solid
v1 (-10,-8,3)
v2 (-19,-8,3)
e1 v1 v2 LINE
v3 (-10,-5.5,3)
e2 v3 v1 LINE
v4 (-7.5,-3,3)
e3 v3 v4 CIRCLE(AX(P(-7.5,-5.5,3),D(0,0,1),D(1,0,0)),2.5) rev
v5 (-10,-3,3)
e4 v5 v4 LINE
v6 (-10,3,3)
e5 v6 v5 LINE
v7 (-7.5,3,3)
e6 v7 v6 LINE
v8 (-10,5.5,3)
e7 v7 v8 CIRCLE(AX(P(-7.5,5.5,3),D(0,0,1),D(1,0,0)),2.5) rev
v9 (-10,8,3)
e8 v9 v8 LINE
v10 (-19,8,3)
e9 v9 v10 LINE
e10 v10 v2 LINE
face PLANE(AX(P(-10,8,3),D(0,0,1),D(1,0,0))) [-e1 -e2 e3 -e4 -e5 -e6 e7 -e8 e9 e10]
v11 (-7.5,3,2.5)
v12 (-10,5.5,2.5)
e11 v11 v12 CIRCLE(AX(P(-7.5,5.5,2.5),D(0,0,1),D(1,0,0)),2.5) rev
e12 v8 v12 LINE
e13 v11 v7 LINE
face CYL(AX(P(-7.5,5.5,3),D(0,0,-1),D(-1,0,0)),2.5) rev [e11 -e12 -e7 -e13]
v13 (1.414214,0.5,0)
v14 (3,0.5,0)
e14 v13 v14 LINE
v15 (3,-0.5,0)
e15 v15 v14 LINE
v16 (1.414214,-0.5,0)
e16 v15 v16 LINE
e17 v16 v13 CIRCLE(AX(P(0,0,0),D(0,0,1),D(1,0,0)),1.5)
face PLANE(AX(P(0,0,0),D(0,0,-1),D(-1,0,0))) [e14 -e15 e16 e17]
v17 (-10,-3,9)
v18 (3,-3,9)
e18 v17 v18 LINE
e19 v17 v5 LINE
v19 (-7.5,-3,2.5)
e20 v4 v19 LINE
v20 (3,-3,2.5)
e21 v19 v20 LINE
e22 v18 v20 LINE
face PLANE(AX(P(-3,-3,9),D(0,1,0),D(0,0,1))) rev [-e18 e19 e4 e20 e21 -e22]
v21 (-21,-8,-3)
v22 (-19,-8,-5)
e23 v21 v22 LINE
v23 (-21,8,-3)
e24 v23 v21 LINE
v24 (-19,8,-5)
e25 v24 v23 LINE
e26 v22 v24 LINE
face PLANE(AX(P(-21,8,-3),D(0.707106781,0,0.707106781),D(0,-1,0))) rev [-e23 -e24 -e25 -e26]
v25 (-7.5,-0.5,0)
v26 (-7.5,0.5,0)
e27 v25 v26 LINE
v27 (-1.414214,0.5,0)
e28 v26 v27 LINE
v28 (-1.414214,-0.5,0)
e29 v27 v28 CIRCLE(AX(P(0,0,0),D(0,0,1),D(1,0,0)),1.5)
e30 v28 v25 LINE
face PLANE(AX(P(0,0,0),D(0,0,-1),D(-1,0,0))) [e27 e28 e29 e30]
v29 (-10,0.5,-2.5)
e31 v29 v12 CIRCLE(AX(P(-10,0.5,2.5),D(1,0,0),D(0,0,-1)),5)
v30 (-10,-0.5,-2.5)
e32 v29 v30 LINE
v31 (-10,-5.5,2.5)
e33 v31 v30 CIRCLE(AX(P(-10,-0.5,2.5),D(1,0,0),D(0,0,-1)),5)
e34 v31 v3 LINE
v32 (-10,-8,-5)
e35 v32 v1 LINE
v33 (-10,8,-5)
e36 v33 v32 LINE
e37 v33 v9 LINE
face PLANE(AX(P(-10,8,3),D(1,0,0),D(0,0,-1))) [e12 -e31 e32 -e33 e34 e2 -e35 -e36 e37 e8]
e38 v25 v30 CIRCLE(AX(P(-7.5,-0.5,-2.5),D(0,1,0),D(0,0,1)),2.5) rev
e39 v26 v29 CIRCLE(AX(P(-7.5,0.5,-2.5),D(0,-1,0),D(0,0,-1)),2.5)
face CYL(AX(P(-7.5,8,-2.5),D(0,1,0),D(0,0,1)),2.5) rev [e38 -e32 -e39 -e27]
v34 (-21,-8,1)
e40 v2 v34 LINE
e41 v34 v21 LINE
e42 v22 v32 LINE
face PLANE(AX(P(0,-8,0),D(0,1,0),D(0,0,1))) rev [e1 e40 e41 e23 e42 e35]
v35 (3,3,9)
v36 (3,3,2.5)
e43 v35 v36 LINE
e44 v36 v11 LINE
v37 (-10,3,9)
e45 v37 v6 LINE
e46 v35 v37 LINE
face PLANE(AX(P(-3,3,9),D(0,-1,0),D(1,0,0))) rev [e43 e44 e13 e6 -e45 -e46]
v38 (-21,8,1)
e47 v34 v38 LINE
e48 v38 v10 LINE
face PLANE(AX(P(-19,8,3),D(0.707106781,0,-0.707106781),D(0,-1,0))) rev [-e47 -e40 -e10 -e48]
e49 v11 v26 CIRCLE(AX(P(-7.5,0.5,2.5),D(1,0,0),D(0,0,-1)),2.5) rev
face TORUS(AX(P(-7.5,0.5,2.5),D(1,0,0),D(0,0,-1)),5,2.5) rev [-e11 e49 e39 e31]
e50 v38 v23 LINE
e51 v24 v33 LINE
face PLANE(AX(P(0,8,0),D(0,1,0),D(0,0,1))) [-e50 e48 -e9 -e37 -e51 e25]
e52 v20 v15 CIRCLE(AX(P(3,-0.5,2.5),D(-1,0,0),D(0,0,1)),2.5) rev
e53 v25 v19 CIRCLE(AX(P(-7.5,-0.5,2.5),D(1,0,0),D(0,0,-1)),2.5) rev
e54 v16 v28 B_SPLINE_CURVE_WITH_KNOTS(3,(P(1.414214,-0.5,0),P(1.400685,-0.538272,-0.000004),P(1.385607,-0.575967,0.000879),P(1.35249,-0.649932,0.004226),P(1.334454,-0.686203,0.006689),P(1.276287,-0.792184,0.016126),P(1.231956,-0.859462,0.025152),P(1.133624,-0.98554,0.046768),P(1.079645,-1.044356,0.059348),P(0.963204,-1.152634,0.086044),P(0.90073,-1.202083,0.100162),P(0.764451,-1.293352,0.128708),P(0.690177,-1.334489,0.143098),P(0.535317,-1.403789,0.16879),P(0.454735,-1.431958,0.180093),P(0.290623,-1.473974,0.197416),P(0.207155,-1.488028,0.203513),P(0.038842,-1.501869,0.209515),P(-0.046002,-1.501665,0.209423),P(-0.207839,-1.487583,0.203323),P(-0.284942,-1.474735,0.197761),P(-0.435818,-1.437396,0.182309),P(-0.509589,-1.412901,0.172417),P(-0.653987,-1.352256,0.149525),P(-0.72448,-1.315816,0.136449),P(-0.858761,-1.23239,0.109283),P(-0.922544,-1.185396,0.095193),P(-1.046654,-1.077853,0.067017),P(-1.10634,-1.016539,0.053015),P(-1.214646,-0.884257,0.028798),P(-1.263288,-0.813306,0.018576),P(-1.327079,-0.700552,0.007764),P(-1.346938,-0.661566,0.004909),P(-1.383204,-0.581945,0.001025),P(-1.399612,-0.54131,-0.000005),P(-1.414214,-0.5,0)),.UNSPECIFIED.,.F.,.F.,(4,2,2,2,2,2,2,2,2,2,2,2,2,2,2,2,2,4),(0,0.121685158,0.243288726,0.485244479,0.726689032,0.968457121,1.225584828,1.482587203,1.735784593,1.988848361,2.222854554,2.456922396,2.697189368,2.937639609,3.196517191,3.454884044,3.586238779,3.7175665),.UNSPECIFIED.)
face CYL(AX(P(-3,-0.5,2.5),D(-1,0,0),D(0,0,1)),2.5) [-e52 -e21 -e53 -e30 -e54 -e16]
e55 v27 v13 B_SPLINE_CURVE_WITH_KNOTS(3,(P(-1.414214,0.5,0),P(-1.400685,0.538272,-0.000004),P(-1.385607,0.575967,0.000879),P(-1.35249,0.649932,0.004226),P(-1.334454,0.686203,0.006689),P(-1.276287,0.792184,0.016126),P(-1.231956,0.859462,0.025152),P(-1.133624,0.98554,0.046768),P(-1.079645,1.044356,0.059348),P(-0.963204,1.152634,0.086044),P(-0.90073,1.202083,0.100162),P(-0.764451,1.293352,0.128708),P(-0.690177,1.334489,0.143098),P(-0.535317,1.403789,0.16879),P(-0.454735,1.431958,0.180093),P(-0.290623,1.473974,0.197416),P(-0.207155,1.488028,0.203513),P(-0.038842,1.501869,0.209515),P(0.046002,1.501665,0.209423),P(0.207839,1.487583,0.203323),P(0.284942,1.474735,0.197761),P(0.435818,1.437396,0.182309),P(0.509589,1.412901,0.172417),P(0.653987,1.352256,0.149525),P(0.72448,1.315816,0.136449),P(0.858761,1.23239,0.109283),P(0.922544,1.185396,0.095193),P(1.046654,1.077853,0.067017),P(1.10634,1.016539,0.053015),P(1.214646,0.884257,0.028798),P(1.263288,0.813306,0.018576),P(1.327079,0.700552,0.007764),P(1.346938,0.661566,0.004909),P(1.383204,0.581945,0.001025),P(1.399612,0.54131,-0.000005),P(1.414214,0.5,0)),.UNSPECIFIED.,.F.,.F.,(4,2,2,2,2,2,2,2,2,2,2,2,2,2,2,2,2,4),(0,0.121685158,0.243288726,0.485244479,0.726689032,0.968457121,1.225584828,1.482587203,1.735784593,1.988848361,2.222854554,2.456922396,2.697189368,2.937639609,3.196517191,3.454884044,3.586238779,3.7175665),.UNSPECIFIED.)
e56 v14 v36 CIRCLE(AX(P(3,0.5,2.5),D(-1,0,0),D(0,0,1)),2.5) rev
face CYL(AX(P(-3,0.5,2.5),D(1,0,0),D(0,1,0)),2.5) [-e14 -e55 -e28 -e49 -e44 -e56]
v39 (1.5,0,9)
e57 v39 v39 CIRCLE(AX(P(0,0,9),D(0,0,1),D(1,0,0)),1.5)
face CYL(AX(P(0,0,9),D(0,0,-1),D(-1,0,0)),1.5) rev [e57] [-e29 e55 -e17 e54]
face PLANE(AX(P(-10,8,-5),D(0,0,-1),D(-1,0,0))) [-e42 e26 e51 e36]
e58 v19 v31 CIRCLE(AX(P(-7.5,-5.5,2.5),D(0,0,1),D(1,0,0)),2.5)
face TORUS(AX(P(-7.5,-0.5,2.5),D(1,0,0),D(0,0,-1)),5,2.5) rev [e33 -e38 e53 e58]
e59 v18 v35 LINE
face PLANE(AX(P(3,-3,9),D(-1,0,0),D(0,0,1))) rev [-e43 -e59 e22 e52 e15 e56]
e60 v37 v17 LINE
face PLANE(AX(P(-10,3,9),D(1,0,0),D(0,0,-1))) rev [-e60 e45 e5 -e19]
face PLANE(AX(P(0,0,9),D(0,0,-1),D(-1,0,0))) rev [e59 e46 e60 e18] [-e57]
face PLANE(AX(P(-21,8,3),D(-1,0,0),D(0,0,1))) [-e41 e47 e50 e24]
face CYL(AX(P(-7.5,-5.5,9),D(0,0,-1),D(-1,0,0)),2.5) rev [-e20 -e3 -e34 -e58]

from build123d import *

# Parameters (mm, degrees)
ESBO_O1_R                     = 1.5
RESSALTO_EXTRUS_O1_DEPTH      = 9
RESSALTO_EXTRUS_O2_DEPTH      = 5
RESSALTO_EXTRUS_O2_DEPTH_BACK = 11
ESBO_O2_W                     = 11
ESBO_O2_H                     = 8
FILETE1_R                     = 2.5
CHANFRO1_SIZE                 = 2


with BuildPart() as part:
    # Esboço1 → Ressalto-extrusão1 (new body)
    with BuildSketch(Plane.XY):
        Polygon((-3, -3), (3, -3), (3, 3), (-3, 3), (-10, 3), (-10, -3), align=None)
        Circle(ESBO_O1_R, mode=Mode.SUBTRACT)
    extrude(amount=RESSALTO_EXTRUS_O1_DEPTH)

    # Esboço2 → Ressalto-extrusão2 (add, two sides: drawn at the far end of the back side and taken through both)
    with BuildSketch(Plane.XZ.offset(3).offset(-RESSALTO_EXTRUS_O2_DEPTH_BACK)):
        with Locations((-15.5, -1)):
            Rectangle(ESBO_O2_W, ESBO_O2_H)
    extrude(amount=RESSALTO_EXTRUS_O2_DEPTH + RESSALTO_EXTRUS_O2_DEPTH_BACK)

    # Filete1
    # the kernel refuses this fillet: 2.5 mm, written as the material it takes off along each edge
    with BuildSketch(Plane(origin=(-10, -3, 0), x_dir=(0, 0, 1), z_dir=(1, 0, 0))) as filete1_piece_1:
        with BuildLine():
            CenterArc((FILETE1_R, -FILETE1_R), FILETE1_R, 90, 90)
            Line((0, -FILETE1_R), (0, 0))
            Line((0, 0), (FILETE1_R, 0))
        make_face()
    extrude(amount=19.25, mode=Mode.SUBTRACT)
    with BuildSketch(Plane(origin=(9.25, 3, 0), x_dir=(0, -1, 0), z_dir=(-1, 0, 0))) as filete1_piece_2:
        with BuildLine():
            CenterArc((FILETE1_R, FILETE1_R), FILETE1_R, 180, 90)
            Line((0, FILETE1_R), (0, 0))
            Line((0, 0), (FILETE1_R, 0))
        make_face()
    extrude(amount=19.25, mode=Mode.SUBTRACT)
    # the kernel refuses this fillet: 2.5 mm, written as the material it adds along each edge
    with BuildSketch(Plane(origin=(-10, -3, 2.5), x_dir=(1, 0, 0), z_dir=(0, 0, 1)), Plane(origin=(-10, 3, 2.5), x_dir=(0, 1, 0), z_dir=(0, 0, 1))) as filete1_2_piece_1:
        with BuildLine():
            CenterArc((FILETE1_R, -FILETE1_R), FILETE1_R, 90, 90)
            Line((0, -FILETE1_R), (0, 0))
            Line((0, 0), (FILETE1_R, 0))
        make_face()
    extrude(amount=0.5)
    with BuildSketch(Plane(origin=(-10, 0.5, 0), x_dir=(0, 0, -1), z_dir=(0, -1, 0))) as filete1_2_piece_2:
        with BuildLine():
            CenterArc((FILETE1_R, FILETE1_R), FILETE1_R, 180, 90)
            Line((0, FILETE1_R), (0, 0))
            Line((0, 0), (FILETE1_R, 0))
        make_face()
    extrude(amount=1)
    with BuildSketch(Plane(origin=(-10, 0.5, 2.5), x_dir=(0, 0, -1), z_dir=(0, -1, 0))) as filete1_2_piece_3:
        with BuildLine():
            CenterArc((2.5 + FILETE1_R, FILETE1_R), FILETE1_R, 180, 90)
            Line((2.5, FILETE1_R), (2.5, 0))
            Line((2.5, 0), (2.5 + FILETE1_R, 0))
        make_face()
    revolve(axis=Axis((-10, 0.5, 2.5), (1, 0, 0)), revolution_arc=90)
    with BuildSketch(Plane(origin=(-10, -0.5, 2.5), x_dir=(0, -1, 0), z_dir=(0, 0, 1))) as filete1_2_piece_4:
        with BuildLine():
            CenterArc((2.5 + FILETE1_R, FILETE1_R), FILETE1_R, 180, 90)
            Line((2.5, FILETE1_R), (2.5, 0))
            Line((2.5, 0), (2.5 + FILETE1_R, 0))
        make_face()
    revolve(axis=Axis((-10, -0.5, 2.5), (1, 0, 0)), revolution_arc=90)

    # Chanfro1
    chanfro1_edges = [part.edges().sort_by_distance(p)[0] for p in [
        (-21, 0, -5),
        (-21, 0, 3),
    ]]
    chamfer(chanfro1_edges, length=CHANFRO1_SIZE)


solid = part.part
